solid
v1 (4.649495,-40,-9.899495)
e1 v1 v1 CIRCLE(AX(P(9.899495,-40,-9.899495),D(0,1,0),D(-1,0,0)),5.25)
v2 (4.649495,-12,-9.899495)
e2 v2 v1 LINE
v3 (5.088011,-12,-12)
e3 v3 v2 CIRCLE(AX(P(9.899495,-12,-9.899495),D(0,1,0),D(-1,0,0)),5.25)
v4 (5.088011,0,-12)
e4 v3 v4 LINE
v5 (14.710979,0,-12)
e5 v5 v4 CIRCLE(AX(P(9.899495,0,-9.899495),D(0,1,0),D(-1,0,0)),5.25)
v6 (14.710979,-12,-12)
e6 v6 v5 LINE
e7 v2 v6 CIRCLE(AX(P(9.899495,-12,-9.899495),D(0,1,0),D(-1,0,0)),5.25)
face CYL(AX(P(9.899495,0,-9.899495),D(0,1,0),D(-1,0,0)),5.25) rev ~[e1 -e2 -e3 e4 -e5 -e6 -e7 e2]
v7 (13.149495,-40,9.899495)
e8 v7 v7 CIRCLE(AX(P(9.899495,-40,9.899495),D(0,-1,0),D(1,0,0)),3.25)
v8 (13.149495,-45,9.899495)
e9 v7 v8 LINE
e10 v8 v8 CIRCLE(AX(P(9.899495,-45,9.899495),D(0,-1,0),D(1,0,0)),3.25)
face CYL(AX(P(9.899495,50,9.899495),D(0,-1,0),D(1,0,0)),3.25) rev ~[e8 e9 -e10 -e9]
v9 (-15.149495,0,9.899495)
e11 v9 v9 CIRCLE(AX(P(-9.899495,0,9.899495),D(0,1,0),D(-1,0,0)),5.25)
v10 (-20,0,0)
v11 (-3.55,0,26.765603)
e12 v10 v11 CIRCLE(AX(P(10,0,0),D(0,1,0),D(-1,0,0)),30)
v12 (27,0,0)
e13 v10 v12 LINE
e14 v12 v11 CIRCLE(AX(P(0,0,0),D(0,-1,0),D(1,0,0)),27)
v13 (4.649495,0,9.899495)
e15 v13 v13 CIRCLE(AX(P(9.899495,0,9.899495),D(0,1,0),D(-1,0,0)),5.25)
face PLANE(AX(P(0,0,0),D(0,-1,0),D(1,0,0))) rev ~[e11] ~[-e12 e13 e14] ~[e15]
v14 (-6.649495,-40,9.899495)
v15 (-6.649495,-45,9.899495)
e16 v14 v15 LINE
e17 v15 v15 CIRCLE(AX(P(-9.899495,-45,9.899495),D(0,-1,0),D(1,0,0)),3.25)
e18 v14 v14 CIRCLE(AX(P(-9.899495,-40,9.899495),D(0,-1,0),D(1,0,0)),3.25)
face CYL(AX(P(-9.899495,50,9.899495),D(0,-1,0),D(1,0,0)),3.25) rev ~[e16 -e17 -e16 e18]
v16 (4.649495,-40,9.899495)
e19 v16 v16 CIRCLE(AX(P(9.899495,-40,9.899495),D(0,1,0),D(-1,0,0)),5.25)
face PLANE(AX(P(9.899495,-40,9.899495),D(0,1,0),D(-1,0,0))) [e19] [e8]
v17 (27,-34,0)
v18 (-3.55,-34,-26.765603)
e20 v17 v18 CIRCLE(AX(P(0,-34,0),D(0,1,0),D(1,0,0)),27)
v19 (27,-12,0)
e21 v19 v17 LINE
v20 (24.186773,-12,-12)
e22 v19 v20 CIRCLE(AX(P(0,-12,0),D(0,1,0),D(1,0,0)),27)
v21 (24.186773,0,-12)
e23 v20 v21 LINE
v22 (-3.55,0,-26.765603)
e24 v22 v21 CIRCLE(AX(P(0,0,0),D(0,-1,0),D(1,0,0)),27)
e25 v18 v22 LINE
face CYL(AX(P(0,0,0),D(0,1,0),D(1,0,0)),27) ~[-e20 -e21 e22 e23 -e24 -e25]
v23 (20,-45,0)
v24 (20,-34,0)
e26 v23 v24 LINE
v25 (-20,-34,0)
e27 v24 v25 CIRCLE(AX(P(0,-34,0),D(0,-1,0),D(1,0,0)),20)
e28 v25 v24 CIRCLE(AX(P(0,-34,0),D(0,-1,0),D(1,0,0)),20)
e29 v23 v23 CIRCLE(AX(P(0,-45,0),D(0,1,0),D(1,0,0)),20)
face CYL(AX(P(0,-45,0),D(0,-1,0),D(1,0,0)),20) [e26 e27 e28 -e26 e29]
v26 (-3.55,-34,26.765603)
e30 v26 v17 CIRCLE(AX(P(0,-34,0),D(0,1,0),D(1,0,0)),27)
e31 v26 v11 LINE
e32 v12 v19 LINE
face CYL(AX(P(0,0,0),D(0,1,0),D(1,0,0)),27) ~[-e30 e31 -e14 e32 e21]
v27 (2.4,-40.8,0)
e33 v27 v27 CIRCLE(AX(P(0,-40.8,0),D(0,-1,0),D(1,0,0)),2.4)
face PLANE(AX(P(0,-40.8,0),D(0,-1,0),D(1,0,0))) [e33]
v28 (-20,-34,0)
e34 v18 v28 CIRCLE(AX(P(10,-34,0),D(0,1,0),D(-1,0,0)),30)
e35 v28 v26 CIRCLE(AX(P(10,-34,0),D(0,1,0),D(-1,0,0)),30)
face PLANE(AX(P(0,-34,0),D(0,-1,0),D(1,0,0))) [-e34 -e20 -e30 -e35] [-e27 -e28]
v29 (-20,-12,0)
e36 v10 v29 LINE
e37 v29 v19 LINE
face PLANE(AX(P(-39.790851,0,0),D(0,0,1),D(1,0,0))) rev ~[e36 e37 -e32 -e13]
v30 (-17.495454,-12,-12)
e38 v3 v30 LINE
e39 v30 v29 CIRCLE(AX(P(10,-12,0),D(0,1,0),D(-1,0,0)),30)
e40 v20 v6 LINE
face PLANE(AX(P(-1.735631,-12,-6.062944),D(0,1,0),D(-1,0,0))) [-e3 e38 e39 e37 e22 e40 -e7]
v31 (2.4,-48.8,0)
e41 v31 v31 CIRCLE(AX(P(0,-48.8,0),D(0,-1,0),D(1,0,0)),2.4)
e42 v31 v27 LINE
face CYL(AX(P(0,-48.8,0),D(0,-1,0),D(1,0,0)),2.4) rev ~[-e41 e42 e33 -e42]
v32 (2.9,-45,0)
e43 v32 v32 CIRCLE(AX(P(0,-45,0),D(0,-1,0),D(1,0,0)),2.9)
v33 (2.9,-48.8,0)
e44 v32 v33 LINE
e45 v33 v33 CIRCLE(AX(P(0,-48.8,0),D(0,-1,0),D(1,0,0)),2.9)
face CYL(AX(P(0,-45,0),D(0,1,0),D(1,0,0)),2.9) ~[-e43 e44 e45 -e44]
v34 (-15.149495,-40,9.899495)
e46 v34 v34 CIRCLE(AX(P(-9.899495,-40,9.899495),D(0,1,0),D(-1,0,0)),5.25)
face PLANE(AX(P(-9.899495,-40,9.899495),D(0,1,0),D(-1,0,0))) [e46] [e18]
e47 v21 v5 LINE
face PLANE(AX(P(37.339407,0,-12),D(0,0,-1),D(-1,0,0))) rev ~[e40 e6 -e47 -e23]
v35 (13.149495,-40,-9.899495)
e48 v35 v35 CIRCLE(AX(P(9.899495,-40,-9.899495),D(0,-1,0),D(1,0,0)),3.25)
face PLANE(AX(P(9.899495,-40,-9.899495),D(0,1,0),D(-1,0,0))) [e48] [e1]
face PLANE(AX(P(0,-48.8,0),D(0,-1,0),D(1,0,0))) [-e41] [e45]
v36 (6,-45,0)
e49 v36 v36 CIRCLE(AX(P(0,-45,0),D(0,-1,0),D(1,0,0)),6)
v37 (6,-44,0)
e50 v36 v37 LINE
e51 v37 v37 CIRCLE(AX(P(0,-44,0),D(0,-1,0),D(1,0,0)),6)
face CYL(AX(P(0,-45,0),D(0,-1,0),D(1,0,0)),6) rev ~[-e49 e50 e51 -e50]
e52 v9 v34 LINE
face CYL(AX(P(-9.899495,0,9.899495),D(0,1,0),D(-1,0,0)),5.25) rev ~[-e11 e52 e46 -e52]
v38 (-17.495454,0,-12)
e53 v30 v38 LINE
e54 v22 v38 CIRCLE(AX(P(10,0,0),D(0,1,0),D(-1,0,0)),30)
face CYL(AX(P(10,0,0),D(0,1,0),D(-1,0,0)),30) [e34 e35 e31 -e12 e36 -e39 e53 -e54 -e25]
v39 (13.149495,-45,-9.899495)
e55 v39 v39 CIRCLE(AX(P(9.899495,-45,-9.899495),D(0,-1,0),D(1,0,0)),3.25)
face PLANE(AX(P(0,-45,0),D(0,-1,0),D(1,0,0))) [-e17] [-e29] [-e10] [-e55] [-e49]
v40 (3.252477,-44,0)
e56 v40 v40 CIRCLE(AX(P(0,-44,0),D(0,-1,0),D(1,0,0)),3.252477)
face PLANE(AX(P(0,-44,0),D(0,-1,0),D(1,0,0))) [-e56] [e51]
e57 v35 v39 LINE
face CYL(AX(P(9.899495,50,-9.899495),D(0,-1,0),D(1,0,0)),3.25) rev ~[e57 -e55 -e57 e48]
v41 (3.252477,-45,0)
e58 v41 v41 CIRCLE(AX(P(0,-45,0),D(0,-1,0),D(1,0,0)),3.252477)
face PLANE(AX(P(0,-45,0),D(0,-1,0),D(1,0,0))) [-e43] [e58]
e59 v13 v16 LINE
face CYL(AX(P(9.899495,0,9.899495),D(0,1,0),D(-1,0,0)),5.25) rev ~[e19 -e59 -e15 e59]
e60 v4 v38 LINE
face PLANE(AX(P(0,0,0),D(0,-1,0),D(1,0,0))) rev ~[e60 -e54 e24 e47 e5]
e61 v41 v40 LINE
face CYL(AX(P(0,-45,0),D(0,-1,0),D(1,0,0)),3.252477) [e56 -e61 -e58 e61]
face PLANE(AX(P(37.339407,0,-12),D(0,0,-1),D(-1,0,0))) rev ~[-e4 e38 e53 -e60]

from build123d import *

# Parameters (mm, degrees)
F0_R      = 27
F1_DEPTH  = 45
F2_R      = 41.8433440982
F2_R_2    = 20
F3_DEPTH  = 11
F5_D      = 6.5
F5_DEPTH  = 50
F5_TIP    = 1.9527970118
F6_R      = 5.25
F7_DEPTH  = 40
F8_R      = 2.9
F9_DEPTH  = 3.8
F10_R     = 2.4
F11_DEPTH = 8
F12_R     = 6
F12_R_2   = 3.2524774455
F13_DEPTH = 1
F15_DEPTH = 12
F16_R     = 45.2689658455
F16_R_2   = 30
F17_DEPTH = 53.4


# Not quite as in the source:
# - a feature names something its author has since deleted; it is built from what else it names


with BuildPart() as f1:
    # F0 (on Front) → F1 (new body)
    with BuildSketch(Plane.XZ):
        Circle(F0_R)
    extrude(amount=F1_DEPTH)

    # F2 (on face) → F3 (cut)
    with BuildSketch(Plane.XZ.offset(45)):
        Circle(F2_R)
        Circle(F2_R_2, mode=Mode.SUBTRACT)
    extrude(amount=-F3_DEPTH, mode=Mode.SUBTRACT)

    # F5
    with Locations(Plane(origin=(0, 0, 0), x_dir=(-1, 0, 0), z_dir=(0, 1, 0))):
        with Locations((-9.8994949366, 9.8994949366), (9.8994949366, 9.8994949366), (-9.8994949366, -9.8994949366)):
            Hole(F5_D / 2, depth=F5_DEPTH)
            with Locations((0, 0, -(F5_DEPTH + F5_TIP / 2))):  # 118° drill point
                Cone(0, F5_D / 2, F5_TIP, mode=Mode.SUBTRACT)

    # F6 (on face) → F7 (cut)
    with BuildSketch(Plane(origin=(0, 0, 0), x_dir=(-1, 0, 0), z_dir=(0, 1, 0))):
        with Locations((-9.8994949366, -9.8994949366)):
            Circle(F6_R)
        with Locations((9.8994949366, 9.8994949366)):
            Circle(F6_R)
        with Locations((-9.8994949366, 9.8994949366)):
            Circle(F6_R)
    extrude(amount=-F7_DEPTH, mode=Mode.SUBTRACT)

    # F8 (on face) → F9 (join)
    with BuildSketch(Plane.XZ.offset(45)):
        Circle(F8_R)
    extrude(amount=F9_DEPTH)

    # F10 (on face) → F11 (cut)
    with BuildSketch(Plane.XZ.offset(48.8)):
        Circle(F10_R)
    extrude(amount=-F11_DEPTH, mode=Mode.SUBTRACT)

    # F12 (on face) → F13 (cut)
    with BuildSketch(Plane.XZ.offset(45)):
        Circle(F12_R)
        Circle(F12_R_2, mode=Mode.SUBTRACT)
    extrude(amount=-F13_DEPTH, mode=Mode.SUBTRACT)

    # F14 (on face) → F15 (cut)
    with BuildSketch(Plane(origin=(0, 0, 0), x_dir=(-1, 0, 0), z_dir=(0, 1, 0))):
        Polygon((39.7908514319, 0), (0, 0), (-37.339406552, 0), (-37.339406552, -12), (41.6823292512, -12), align=None)
    extrude(amount=-F15_DEPTH, mode=Mode.SUBTRACT)

    # F16 (on face) → F17 (cut)
    with BuildSketch(Plane(origin=(0, 0, 0), x_dir=(-1, 0, 0), z_dir=(0, 1, 0))):
        with Locations((-10, 0)):
            Circle(F16_R)
        with Locations((-10, 0)):
            Circle(F16_R_2, mode=Mode.SUBTRACT)
    extrude(amount=-F17_DEPTH, mode=Mode.SUBTRACT)


solid = f1.part
